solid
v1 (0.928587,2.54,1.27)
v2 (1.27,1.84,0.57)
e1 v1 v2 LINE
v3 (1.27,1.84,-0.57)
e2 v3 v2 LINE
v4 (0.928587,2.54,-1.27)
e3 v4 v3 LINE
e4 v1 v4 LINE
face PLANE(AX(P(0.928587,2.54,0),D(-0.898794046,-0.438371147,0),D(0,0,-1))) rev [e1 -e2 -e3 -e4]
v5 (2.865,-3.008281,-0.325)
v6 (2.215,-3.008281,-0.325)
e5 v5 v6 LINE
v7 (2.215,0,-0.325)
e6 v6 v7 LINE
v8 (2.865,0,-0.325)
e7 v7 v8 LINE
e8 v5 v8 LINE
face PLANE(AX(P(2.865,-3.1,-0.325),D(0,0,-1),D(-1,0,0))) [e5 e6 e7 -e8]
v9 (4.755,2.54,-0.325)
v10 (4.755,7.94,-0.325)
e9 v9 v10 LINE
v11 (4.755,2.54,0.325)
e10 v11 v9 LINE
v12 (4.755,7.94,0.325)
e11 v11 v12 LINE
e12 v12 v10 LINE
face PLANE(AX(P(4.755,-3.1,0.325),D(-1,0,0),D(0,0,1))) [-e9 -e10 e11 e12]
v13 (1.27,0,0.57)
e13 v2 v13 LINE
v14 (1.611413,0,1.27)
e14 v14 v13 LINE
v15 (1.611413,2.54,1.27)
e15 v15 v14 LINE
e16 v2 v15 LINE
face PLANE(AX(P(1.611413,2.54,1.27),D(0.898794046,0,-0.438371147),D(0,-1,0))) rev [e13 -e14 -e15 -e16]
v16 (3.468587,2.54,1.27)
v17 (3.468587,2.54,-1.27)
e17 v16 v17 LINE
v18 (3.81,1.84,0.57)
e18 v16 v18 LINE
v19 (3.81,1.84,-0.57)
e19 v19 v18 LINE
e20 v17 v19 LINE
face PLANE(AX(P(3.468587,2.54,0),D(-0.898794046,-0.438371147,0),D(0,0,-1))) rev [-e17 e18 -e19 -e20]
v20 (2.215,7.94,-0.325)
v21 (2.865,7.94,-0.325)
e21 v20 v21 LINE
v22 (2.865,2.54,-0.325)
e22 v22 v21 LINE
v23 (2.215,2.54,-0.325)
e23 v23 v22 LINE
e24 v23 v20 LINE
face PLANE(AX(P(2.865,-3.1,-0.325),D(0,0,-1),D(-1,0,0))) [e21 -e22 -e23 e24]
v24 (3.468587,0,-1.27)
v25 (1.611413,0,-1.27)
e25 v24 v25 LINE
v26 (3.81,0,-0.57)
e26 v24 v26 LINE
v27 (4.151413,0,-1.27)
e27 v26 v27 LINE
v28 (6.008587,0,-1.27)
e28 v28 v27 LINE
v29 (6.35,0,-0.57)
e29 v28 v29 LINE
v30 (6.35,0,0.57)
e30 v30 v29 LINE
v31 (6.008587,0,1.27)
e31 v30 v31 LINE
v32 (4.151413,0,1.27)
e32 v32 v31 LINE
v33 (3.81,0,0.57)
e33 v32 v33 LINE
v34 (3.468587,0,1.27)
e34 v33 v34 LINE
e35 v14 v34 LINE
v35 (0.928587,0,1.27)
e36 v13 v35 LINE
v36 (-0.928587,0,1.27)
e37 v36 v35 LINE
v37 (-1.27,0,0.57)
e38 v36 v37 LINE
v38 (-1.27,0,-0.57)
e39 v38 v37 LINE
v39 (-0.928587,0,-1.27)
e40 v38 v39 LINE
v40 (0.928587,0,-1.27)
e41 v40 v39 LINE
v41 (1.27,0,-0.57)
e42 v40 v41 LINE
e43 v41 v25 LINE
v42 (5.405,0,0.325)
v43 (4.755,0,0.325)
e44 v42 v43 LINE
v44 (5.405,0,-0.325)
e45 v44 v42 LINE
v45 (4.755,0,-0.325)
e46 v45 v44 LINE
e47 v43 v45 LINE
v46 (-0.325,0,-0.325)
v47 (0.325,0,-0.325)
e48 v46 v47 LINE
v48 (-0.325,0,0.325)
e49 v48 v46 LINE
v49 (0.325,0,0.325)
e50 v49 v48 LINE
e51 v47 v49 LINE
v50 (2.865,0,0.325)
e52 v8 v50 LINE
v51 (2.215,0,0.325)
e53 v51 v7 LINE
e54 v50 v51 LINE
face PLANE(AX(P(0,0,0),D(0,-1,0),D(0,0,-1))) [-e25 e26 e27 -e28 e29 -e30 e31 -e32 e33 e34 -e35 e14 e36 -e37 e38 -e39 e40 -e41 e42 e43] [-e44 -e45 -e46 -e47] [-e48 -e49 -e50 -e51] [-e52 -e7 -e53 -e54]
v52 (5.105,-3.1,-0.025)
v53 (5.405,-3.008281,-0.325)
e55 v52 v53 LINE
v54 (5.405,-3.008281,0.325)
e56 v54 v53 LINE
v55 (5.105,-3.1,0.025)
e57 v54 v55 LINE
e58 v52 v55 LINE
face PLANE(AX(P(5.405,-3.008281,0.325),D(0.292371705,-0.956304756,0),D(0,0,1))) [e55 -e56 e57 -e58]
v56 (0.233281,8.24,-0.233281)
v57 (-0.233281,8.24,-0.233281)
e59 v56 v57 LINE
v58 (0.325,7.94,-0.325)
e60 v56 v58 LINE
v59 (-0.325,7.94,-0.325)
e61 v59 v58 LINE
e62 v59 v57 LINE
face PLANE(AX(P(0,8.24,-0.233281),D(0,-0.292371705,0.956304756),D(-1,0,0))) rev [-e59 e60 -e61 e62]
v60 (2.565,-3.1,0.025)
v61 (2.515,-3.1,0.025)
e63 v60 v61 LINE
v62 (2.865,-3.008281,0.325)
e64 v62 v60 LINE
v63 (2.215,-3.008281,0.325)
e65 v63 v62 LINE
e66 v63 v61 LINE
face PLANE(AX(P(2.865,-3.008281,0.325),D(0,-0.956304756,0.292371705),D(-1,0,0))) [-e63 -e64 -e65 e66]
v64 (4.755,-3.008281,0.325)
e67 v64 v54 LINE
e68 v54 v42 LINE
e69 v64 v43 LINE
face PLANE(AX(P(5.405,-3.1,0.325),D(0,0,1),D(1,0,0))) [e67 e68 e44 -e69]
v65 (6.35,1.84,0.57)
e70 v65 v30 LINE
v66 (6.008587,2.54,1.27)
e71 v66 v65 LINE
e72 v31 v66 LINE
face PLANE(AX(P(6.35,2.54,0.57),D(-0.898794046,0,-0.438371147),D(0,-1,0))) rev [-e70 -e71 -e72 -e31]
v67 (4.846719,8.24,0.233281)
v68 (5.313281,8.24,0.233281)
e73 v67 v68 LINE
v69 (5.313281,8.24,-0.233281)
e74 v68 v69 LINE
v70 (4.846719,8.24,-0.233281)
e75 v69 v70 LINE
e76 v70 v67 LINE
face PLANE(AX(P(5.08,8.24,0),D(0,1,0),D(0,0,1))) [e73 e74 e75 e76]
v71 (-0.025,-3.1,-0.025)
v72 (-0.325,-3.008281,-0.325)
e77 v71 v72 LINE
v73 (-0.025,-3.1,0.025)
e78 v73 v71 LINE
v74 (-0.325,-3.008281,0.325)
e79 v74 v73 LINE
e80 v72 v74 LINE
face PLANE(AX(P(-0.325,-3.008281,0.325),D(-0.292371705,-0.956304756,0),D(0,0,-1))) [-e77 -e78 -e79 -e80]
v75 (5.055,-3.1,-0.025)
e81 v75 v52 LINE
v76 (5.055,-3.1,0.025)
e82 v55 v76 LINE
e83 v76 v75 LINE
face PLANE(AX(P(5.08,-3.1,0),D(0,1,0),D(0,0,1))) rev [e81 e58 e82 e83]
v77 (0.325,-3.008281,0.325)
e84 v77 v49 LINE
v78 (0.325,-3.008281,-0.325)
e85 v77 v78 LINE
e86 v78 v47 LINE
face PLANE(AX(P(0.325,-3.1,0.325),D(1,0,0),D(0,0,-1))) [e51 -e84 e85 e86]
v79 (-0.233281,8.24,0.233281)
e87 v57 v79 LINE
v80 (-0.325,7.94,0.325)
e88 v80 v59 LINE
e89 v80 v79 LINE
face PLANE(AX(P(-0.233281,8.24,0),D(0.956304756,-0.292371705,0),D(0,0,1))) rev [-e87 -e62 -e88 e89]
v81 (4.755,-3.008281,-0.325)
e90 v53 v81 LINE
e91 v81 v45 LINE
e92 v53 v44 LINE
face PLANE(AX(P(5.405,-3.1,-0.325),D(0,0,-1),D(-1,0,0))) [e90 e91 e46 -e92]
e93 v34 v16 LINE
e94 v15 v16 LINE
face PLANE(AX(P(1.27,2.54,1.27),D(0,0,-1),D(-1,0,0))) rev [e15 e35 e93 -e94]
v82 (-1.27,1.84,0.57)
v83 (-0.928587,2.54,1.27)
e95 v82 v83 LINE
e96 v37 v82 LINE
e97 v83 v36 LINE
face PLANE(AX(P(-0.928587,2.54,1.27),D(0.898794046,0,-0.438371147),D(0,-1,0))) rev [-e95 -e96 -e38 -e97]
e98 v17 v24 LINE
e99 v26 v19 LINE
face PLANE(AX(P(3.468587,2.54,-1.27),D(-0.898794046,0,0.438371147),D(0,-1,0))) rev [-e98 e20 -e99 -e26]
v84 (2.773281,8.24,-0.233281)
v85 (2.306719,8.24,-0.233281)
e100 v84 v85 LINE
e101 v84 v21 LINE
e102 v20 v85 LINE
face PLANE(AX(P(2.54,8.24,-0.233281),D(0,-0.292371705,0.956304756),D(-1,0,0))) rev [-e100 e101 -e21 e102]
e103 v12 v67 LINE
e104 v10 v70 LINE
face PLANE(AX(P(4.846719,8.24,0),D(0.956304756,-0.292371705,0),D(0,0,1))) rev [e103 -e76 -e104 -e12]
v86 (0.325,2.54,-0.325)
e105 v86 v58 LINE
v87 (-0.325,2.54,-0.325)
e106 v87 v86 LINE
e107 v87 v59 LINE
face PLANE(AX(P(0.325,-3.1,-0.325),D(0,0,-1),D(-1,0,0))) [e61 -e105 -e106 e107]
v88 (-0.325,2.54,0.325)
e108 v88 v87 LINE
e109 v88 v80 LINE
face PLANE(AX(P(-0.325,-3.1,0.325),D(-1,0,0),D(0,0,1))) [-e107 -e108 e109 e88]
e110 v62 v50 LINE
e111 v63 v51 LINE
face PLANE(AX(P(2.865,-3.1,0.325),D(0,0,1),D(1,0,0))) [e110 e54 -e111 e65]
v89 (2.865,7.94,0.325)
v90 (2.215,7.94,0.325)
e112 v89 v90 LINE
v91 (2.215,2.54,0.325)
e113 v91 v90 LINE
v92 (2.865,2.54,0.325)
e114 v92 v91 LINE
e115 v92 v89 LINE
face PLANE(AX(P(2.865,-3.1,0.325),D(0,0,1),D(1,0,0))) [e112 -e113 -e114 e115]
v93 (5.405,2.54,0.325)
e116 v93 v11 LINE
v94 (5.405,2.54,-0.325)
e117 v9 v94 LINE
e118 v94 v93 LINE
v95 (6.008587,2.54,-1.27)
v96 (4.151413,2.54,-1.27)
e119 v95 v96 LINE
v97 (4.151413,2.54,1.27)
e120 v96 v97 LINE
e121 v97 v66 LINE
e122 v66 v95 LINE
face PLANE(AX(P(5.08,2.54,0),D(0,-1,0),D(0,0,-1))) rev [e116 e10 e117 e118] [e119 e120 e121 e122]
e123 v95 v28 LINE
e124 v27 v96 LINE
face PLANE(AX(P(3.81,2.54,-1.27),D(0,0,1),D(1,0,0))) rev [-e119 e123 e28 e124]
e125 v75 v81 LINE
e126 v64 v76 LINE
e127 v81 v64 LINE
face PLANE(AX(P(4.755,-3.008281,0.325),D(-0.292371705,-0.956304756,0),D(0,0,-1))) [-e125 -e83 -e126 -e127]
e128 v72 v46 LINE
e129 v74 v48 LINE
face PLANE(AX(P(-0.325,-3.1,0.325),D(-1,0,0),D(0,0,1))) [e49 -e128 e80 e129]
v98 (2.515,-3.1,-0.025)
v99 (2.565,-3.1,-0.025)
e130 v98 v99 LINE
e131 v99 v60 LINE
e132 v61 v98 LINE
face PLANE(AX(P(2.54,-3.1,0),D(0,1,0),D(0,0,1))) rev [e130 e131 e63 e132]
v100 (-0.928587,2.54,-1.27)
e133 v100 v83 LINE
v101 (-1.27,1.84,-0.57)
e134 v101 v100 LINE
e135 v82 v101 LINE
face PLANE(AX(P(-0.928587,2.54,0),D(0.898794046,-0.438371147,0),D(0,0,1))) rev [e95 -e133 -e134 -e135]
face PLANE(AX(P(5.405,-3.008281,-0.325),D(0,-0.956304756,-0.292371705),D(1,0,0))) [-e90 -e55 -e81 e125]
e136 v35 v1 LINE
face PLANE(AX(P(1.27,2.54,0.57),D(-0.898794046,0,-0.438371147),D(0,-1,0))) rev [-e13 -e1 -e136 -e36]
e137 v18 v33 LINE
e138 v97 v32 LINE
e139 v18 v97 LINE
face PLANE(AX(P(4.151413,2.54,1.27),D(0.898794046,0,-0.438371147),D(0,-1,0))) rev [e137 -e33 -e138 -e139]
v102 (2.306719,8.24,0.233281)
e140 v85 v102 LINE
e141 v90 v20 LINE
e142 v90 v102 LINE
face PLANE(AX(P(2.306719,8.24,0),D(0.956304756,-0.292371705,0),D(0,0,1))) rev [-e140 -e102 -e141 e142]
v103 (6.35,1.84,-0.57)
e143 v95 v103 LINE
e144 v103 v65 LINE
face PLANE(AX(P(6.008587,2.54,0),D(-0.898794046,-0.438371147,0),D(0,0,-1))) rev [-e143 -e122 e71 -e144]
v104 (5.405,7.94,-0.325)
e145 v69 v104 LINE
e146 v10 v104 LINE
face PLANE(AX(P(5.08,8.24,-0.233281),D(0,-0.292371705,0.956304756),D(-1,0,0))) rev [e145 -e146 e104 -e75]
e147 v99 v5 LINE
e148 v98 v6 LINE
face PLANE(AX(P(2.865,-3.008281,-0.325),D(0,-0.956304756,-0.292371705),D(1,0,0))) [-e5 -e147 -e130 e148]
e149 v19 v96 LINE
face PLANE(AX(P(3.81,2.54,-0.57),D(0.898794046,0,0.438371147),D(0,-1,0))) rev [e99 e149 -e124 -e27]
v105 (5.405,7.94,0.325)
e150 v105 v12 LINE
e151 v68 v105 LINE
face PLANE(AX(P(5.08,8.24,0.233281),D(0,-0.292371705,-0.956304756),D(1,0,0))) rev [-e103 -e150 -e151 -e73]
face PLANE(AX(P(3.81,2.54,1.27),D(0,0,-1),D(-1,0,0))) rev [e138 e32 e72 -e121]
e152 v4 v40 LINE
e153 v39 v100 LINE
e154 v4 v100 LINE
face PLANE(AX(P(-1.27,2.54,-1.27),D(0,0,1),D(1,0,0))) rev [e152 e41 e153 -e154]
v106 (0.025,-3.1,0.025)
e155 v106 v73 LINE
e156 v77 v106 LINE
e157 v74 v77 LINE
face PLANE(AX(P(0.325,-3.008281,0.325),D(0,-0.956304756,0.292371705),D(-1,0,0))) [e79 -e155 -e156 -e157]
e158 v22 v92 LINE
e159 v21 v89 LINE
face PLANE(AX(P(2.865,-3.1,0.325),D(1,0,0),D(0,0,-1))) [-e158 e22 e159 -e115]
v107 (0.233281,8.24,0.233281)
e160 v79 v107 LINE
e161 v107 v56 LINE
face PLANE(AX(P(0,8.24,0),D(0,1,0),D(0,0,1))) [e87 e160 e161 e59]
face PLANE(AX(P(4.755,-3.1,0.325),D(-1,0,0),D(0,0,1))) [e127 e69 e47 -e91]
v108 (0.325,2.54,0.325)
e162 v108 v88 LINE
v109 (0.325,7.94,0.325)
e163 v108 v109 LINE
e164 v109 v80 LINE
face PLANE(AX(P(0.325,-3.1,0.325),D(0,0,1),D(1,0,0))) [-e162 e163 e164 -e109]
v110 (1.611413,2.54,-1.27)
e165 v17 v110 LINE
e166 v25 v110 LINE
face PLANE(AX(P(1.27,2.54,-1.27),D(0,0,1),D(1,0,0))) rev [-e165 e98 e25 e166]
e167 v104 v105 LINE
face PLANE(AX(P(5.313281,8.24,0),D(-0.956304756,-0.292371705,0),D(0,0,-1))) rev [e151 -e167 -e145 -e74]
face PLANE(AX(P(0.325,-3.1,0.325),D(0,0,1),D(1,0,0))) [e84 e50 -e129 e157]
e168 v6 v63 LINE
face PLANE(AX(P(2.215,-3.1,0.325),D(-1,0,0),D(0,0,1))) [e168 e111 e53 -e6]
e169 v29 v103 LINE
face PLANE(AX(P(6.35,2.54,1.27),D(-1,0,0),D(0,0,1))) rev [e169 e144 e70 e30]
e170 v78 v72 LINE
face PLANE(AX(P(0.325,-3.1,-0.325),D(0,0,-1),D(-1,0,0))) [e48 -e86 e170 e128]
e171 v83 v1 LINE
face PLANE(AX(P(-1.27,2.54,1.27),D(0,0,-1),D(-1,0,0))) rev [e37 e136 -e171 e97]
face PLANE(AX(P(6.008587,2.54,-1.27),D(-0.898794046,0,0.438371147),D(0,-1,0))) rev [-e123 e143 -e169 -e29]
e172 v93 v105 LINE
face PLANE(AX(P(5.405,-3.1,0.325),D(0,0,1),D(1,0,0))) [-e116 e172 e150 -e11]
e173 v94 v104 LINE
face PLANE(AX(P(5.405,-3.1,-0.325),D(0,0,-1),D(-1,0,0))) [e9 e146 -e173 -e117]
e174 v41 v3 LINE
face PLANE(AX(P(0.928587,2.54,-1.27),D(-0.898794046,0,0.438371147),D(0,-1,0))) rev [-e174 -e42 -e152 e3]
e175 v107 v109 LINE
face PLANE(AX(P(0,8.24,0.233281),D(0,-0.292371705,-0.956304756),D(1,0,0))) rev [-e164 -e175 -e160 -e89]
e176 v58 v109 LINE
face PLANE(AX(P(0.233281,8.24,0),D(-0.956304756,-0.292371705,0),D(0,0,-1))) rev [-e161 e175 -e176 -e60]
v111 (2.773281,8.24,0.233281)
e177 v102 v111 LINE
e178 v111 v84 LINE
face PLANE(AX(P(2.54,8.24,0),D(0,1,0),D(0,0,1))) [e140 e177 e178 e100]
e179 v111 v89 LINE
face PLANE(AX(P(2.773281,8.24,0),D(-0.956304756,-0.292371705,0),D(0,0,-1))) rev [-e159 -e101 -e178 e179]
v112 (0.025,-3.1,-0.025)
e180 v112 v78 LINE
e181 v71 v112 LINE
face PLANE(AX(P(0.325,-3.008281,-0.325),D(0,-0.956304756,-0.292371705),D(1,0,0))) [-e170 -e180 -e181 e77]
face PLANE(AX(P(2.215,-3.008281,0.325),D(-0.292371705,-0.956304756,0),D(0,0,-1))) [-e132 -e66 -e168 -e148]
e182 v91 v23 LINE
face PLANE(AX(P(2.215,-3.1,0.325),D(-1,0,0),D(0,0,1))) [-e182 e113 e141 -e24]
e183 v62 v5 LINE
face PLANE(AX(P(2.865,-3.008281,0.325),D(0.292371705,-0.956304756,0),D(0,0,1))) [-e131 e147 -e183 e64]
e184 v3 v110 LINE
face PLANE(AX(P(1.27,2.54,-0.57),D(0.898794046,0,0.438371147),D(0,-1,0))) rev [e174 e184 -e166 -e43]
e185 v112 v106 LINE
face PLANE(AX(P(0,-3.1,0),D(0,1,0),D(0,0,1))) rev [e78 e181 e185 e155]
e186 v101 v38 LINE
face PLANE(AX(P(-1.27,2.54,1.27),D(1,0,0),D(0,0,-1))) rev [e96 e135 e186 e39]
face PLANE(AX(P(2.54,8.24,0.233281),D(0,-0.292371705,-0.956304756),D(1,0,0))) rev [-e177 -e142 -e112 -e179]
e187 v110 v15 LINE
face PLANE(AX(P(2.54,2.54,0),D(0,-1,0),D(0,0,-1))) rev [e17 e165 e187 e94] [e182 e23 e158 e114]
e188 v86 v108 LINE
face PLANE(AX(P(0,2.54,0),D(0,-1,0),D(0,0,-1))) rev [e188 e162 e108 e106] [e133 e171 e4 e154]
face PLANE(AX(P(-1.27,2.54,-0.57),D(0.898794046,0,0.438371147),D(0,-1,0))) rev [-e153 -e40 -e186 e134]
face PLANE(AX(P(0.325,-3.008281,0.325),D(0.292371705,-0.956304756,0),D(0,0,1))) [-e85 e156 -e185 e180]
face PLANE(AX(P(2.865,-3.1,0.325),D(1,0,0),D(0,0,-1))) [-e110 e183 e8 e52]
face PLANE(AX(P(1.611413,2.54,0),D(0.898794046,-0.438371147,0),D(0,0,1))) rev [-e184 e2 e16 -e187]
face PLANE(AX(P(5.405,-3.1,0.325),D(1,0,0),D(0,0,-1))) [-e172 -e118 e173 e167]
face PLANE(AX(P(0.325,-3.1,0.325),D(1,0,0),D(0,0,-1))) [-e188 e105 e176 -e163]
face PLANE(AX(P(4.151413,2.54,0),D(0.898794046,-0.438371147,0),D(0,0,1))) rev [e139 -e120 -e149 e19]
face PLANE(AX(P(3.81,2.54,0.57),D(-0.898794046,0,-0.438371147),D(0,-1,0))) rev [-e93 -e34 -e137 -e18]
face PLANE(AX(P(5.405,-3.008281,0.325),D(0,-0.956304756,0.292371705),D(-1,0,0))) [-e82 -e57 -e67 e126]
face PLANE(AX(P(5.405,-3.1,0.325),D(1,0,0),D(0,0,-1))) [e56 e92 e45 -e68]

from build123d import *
from OCP.BRepFilletAPI import BRepFilletAPI_MakeChamfer

# Parameters (mm, degrees)
SKETCH1_W                    = 2.54
SKETCH1_H                    = 2.54
BOSS_EXTRUDE1_DEPTH          = 2.54
BOSS_EXTRUDE2_START          = -5.64
SKETCH2_W                    = 0.65
SKETCH2_H                    = 0.65
BOSS_EXTRUDE2_DEPTH          = 11.34
CHAMFER1_SIZE                = 0.3
CHAMFER1_SIZE2               = 0.091719204
CHAMFER3_SIZE                = 0.7
CHAMFER3_SIZE2               = 0.341412812
CHAMFER4_SIZE                = 0.7
CHAMFER4_SIZE2               = 0.341412812
R_P_TITION_START             = -1.27
R_P_TITION_LIN_AIRE3_DEPTH   = 2.54
R_P_TITION_START_2           = -0.325
R_P_TITION_LIN_AIRE3_2_DEPTH = 0.65
R_P_TITION_START_3           = 1.611412812
R_P_TITION_LIN_AIRE3_3_DEPTH = 4.397174376
R_P_TITION_START_4           = -1
R_P_TITION_LIN_AIRE3_4_DEPTH = 5


with BuildPart() as part:
    # Sketch1 → Boss-Extrude1 (new body)
    with BuildSketch(Plane(origin=(0, 0, 0), x_dir=(1, 0, 0), z_dir=(0, 1, 0))):
        Rectangle(SKETCH1_W, SKETCH1_H)
    extrude(amount=BOSS_EXTRUDE1_DEPTH)

    # Sketch2 → Boss-Extrude2 (add)
    with BuildSketch(Plane(origin=(0, 2.54, 0), x_dir=(1, 0, 0), z_dir=(0, 1, 0)).offset(BOSS_EXTRUDE2_START)):
        Rectangle(SKETCH2_W, SKETCH2_H)
    extrude(amount=BOSS_EXTRUDE2_DEPTH)

    # Chamfer1: one chamfer whose edges measure the first distance from different faces: ONE call of the kernel's chamfer builder (chamfer() names one face for all edges)
    chamfer1_edges_1 = [part.edges().sort_by_distance(p)[0] for p in [
        (-0.325, -3.1, 0),
        (0, -3.1, -0.325),
        (0.325, -3.1, 0),
        (0, -3.1, 0.325),
    ]]
    chamfer1_side_1 = [part.faces().sort_by_distance(p)[0] for p in [
        (0, -3.1, 0),
    ]]
    chamfer1_edges_2 = [part.edges().sort_by_distance(p)[0] for p in [
        (-0.325, 8.24, 0),
    ]]
    chamfer1_side_2 = [part.faces().sort_by_distance(p)[0] for p in [
        (-0.325, 5.39, 0),
    ]]
    chamfer1_edges_3 = [part.edges().sort_by_distance(p)[0] for p in [
        (0, 8.24, 0.325),
    ]]
    chamfer1_side_3 = [part.faces().sort_by_distance(p)[0] for p in [
        (0, 5.39, 0.325),
    ]]
    chamfer1_edges_4 = [part.edges().sort_by_distance(p)[0] for p in [
        (0.325, 8.24, 0),
    ]]
    chamfer1_side_4 = [part.faces().sort_by_distance(p)[0] for p in [
        (0.325, 5.39, 0),
    ]]
    chamfer1_edges_5 = [part.edges().sort_by_distance(p)[0] for p in [
        (0, 8.24, -0.325),
    ]]
    chamfer1_side_5 = [part.faces().sort_by_distance(p)[0] for p in [
        (0, 5.39, -0.325),
    ]]
    chamfer1 = BRepFilletAPI_MakeChamfer(part.part.solid().wrapped)
    for e in chamfer1_edges_1:
        chamfer1.Add(CHAMFER1_SIZE, CHAMFER1_SIZE2, e.wrapped, chamfer1_side_1[0].wrapped)  # the first distance lies on this face
    for e in chamfer1_edges_2:
        chamfer1.Add(CHAMFER1_SIZE, CHAMFER1_SIZE2, e.wrapped, chamfer1_side_2[0].wrapped)  # the first distance lies on this face
    for e in chamfer1_edges_3:
        chamfer1.Add(CHAMFER1_SIZE, CHAMFER1_SIZE2, e.wrapped, chamfer1_side_3[0].wrapped)  # the first distance lies on this face
    for e in chamfer1_edges_4:
        chamfer1.Add(CHAMFER1_SIZE, CHAMFER1_SIZE2, e.wrapped, chamfer1_side_4[0].wrapped)  # the first distance lies on this face
    for e in chamfer1_edges_5:
        chamfer1.Add(CHAMFER1_SIZE, CHAMFER1_SIZE2, e.wrapped, chamfer1_side_5[0].wrapped)  # the first distance lies on this face
    add(Compound.cast(chamfer1.Shape()), mode=Mode.REPLACE)

    # Chamfer3
    chamfer3_edges = [part.edges().sort_by_distance(p)[0] for p in [
        (1.27, 2.54, 0),
        (1.27, 1.27, 1.27),
        (1.27, 1.27, -1.27),
    ]]
    chamfer3_side = [part.faces().sort_by_distance(p)[0] for p in [
        (1.27, 1.27, 0),
    ]]
    chamfer(chamfer3_edges, length=CHAMFER3_SIZE, length2=CHAMFER3_SIZE2, reference=chamfer3_side[0])

    # Chamfer4
    chamfer4_edges = [part.edges().sort_by_distance(p)[0] for p in [
        (-1.27, 2.54, 0),
        (-1.27, 1.27, 1.27),
        (-1.27, 1.27, -1.27),
    ]]
    chamfer4_side = [part.faces().sort_by_distance(p)[0] for p in [
        (-1.27, 1.27, 0),
    ]]
    chamfer(chamfer4_edges, length=CHAMFER4_SIZE, length2=CHAMFER4_SIZE2, reference=chamfer4_side[0])

    # Répétition linéaire3: read off the stored shape, not the designer's step
    # Répétition linéaire3 outline → Répétition linéaire3 (add)
    with BuildSketch(Plane.XY.offset(R_P_TITION_START)):
        Polygon((3.468587188, 2.54), (1.611412812, 2.54), (1.27, 1.84), (1.27, 0), (6.35, 0), (6.35, 1.84), (6.008587188, 2.54), (4.151412812, 2.54), (3.81, 1.84), align=None)
    extrude(amount=R_P_TITION_LIN_AIRE3_DEPTH)

    # R_p_tition lin_aire3 2 outline → R_p_tition lin_aire3 2 (add)
    with BuildSketch(Plane.XY.offset(R_P_TITION_START_2)):
        Polygon((2.215, 7.94), (2.215, 2.54), (2.865, 2.54), (2.865, 7.94), (2.773280796, 8.24), (2.306719204, 8.24), align=None)
        Polygon((2.865, 0), (2.215, 0), (2.215, -3.008280796), (2.515, -3.1), (2.565, -3.1), (2.865, -3.008280796), align=None)
        Polygon((5.405, 0), (4.755, 0), (4.755, -3.008280796), (5.055, -3.1), (5.105, -3.1), (5.405, -3.008280796), align=None)
        Polygon((4.755, 7.94), (4.755, 2.54), (5.405, 2.54), (5.405, 7.94), (5.313280796, 8.24), (4.846719204, 8.24), align=None)
    extrude(amount=R_P_TITION_LIN_AIRE3_2_DEPTH)

    # R_p_tition lin_aire3 3 outline → R_p_tition lin_aire3 3 (cut)
    with BuildSketch(Plane.YZ.offset(R_P_TITION_START_3)):
        Polygon((-3.1, 0.025), (-3.008280796, 0.325), (-3.1, 0.325), align=None)
        Polygon((-3.008280796, -0.325), (-3.1, -0.025), (-3.1, -0.325), align=None)
        Polygon((8.24, 0.325), (7.94, 0.325), (8.24, 0.233280796), align=None)
        Polygon((8.24, -0.325), (8.24, -0.233280796), (7.94, -0.325), align=None)
    extrude(amount=R_P_TITION_LIN_AIRE3_3_DEPTH, mode=Mode.SUBTRACT)

    # R_p_tition lin_aire3 4 outline → R_p_tition lin_aire3 4 (cut)
    with BuildSketch(Plane(origin=(0, 0, 0), x_dir=(1, 0, 0), z_dir=(0, 1, 0)).offset(R_P_TITION_START_4)):
        Polygon((4.151412812, -1.27), (3.81, -0.57), (3.468587188, -1.27), align=None)
        Polygon((1.27, 0.57), (1.611412812, 1.27), (1.27, 1.27), align=None)
        Polygon((3.81, 0.57), (4.151412812, 1.27), (3.468587188, 1.27), align=None)
        Polygon((6.008587188, 1.27), (6.35, 0.57), (6.35, 1.27), align=None)
        Polygon((6.35, -0.57), (6.008587188, -1.27), (6.35, -1.27), align=None)
        Polygon((1.27, -1.27), (1.611412812, -1.27), (1.27, -0.57), align=None)
    extrude(amount=R_P_TITION_LIN_AIRE3_4_DEPTH, mode=Mode.SUBTRACT)


solid = part.part
